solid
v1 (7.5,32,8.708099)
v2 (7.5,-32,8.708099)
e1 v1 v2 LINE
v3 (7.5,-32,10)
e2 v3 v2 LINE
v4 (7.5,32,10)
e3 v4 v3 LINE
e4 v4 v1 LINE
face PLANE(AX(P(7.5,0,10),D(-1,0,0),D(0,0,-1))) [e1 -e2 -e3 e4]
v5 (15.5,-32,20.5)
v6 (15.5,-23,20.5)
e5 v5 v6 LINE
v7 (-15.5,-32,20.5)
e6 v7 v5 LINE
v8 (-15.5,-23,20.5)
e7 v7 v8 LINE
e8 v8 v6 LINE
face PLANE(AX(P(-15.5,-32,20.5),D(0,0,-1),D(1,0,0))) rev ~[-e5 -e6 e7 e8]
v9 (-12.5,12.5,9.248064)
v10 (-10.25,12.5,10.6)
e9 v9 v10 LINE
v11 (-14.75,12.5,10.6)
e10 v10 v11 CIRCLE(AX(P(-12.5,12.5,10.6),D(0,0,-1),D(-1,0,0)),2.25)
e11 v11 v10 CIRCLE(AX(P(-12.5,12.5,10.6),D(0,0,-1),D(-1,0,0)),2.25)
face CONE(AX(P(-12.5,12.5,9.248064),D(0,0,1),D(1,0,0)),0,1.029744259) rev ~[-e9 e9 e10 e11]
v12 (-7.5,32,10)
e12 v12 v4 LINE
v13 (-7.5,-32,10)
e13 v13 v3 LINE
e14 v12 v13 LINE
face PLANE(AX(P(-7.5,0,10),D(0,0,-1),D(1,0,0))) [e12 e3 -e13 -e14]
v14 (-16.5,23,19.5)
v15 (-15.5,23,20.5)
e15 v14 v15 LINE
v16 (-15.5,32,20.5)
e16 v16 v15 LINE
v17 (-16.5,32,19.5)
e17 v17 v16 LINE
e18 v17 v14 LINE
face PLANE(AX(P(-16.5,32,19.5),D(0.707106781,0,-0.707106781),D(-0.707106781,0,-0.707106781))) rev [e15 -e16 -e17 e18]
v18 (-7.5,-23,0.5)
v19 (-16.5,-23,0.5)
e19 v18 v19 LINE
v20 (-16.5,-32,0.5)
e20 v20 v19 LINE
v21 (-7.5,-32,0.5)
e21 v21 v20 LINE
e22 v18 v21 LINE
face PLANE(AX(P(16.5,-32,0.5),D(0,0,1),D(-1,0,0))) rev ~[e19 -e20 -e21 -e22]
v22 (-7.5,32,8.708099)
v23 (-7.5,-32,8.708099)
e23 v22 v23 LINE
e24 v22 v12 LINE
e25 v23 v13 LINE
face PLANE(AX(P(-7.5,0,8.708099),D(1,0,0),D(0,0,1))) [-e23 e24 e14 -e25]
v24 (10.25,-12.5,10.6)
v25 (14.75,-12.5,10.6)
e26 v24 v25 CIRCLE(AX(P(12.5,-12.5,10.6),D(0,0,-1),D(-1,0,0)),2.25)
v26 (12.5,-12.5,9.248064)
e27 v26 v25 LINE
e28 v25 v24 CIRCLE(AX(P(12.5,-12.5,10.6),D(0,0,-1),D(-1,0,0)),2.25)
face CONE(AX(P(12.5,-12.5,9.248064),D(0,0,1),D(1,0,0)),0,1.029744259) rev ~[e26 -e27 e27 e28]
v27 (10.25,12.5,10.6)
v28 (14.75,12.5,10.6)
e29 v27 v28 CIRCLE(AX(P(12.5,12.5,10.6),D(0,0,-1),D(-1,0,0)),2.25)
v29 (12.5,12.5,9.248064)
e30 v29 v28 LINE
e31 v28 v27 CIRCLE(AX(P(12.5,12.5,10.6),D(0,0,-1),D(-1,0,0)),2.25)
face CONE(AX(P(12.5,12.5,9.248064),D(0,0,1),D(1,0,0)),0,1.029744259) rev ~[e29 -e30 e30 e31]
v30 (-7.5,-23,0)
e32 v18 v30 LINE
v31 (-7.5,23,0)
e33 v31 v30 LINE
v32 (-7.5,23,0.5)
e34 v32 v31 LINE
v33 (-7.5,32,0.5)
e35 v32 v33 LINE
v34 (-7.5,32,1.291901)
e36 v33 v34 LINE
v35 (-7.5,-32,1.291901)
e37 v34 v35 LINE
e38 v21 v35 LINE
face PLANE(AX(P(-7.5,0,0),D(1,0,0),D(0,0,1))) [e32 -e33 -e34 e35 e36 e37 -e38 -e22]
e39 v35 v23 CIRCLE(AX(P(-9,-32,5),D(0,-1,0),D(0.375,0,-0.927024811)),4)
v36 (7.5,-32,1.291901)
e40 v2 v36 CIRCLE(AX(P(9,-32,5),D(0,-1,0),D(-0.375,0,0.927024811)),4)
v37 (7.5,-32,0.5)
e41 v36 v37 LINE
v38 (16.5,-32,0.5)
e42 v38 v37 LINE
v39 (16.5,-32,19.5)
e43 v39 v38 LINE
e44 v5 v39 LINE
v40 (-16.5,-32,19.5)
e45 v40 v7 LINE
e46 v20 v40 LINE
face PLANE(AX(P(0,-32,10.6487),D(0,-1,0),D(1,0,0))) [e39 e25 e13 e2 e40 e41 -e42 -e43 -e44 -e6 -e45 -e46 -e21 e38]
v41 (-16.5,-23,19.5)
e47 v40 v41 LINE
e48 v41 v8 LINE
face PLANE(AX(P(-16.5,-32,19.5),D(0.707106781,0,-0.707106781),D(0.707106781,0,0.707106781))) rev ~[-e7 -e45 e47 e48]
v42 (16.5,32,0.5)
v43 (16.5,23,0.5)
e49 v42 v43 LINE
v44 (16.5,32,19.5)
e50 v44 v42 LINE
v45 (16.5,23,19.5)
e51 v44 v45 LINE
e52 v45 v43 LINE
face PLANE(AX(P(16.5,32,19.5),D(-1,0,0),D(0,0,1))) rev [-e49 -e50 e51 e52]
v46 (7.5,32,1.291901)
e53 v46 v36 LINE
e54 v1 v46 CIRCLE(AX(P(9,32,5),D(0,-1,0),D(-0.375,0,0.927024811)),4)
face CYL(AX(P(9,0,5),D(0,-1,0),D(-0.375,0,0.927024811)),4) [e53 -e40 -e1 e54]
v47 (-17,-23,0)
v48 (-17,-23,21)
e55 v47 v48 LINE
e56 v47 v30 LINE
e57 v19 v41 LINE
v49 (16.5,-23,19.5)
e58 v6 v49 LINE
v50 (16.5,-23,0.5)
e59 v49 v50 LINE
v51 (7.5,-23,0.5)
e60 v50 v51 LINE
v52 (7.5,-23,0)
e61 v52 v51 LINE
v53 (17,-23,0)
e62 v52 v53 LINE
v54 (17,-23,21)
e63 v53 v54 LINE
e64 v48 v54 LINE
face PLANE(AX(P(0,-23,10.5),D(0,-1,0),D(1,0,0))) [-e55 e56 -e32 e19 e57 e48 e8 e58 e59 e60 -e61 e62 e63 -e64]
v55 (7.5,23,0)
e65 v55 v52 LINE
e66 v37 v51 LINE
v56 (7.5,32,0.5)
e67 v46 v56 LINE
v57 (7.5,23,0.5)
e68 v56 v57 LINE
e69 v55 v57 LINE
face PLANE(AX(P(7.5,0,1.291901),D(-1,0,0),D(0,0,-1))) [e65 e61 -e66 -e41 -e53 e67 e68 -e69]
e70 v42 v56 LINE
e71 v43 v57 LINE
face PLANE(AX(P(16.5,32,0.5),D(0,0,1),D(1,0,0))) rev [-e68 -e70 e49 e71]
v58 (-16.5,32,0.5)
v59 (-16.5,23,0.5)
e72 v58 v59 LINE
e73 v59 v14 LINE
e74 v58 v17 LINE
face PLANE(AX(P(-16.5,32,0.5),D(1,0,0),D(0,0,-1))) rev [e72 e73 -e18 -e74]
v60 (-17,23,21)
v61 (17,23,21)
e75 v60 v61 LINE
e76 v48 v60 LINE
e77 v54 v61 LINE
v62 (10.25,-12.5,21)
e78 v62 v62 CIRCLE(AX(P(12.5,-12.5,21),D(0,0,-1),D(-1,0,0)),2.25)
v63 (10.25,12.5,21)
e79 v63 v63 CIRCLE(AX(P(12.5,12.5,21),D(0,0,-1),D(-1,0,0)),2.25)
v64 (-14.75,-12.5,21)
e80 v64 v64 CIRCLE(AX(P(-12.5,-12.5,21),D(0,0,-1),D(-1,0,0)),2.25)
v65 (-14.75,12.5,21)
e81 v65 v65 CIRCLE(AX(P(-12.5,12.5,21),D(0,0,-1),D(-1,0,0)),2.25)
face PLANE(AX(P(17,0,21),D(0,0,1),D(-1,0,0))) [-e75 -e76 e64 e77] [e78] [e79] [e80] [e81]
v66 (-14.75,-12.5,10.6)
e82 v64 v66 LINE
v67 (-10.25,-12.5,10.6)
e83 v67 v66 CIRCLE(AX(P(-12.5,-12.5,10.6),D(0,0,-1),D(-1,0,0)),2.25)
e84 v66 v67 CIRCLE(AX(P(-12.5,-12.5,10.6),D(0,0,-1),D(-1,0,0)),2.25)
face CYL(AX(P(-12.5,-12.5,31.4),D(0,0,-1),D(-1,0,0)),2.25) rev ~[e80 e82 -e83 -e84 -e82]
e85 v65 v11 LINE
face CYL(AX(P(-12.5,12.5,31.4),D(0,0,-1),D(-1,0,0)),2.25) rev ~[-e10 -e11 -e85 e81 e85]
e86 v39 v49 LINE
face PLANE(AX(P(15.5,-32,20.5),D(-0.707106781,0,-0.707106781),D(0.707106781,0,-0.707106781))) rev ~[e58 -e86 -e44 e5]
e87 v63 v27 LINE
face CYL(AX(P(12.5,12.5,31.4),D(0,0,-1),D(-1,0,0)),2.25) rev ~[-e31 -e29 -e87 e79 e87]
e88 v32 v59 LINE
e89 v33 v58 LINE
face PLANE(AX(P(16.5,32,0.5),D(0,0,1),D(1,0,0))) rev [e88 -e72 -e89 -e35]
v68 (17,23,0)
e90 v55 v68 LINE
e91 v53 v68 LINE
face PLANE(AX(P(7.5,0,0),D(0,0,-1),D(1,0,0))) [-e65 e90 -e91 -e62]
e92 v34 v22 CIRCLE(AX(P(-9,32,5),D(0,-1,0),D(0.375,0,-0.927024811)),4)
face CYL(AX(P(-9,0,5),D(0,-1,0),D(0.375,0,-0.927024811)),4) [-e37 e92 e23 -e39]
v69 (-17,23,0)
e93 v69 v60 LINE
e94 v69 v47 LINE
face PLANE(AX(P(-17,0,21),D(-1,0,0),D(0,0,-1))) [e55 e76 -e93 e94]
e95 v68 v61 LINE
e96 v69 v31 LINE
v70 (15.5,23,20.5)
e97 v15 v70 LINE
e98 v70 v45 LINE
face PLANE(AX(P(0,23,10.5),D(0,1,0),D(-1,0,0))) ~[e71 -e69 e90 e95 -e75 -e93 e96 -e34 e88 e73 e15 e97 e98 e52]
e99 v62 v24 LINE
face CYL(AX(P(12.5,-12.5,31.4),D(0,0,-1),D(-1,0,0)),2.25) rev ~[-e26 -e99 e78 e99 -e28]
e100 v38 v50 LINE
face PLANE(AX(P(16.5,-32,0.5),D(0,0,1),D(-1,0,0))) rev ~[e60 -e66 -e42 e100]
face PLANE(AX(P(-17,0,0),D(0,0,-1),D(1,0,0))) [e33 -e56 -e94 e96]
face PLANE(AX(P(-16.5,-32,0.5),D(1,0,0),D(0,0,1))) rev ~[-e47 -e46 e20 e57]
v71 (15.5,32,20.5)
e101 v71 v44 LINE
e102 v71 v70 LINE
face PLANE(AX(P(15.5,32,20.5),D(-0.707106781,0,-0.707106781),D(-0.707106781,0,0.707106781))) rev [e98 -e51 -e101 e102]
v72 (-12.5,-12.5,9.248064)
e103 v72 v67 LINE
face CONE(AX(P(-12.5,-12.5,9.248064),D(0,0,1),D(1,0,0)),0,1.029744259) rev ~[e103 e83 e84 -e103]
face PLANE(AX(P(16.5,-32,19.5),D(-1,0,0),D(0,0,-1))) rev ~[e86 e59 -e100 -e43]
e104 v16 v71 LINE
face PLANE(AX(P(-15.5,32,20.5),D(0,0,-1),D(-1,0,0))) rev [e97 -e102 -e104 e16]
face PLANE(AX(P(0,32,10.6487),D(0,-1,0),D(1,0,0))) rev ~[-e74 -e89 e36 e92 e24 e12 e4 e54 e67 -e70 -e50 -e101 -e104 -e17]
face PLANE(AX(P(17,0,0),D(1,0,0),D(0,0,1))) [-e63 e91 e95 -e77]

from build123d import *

# Parameters (mm, degrees)
F1_DEPTH = 32
F2_W     = 34
F2_H     = 21
F3_DEPTH = 9
F5_D     = 4.5
F5_DEPTH = 10.4
F5_TIP   = 1.3519363928


# Not quite as in the source:
# - a pattern or mirror of a feature is missing from the dataset's text; its kind, count and spacing are read off the source's solid


with BuildPart() as f1:
    # F0 (on Front) → F1 (new body, symmetric)
    with BuildSketch(Plane.XZ):
        with BuildLine():
            Line((-17, 21), (-17, 0))
            Line((-17, 0), (-7.5, 0))
            Line((-7.5, 0), (-7.5, 1.2919007565))
            ThreePointArc((-7.5, 1.2919007565), (-5, 5), (-7.5, 8.7080992435))
            Line((-7.5, 8.7080992435), (-7.5, 10))
            Line((-7.5, 10), (7.5, 10))
            Line((7.5, 10), (7.5, 8.7080992435))
            ThreePointArc((7.5, 8.7080992435), (5, 5), (7.5, 1.2919007565))
            Line((7.5, 1.2919007565), (7.5, 0))
            Line((7.5, 0), (17, 0))
            Line((17, 0), (17, 21))
            Line((17, 21), (-17, 21))
        make_face()
    extrude(amount=F1_DEPTH, both=True)

    # F2 (on face) → F3 (cut)
    with BuildSketch(Plane.XZ.offset(32)):
        with Locations((0, 10.5)):
            Rectangle(F2_W, F2_H)
        Polygon((-16.5, 19.5), (-15.5, 20.5), (15.5, 20.5), (16.5, 19.5), (16.5, 0.5), (-16.5, 0.5), align=None, mode=Mode.SUBTRACT)
    f3 = extrude(amount=-F3_DEPTH, mode=Mode.SUBTRACT)

    # F3_copies: F3 across plane
    add(f3.mirror(Plane.ZX), mode=Mode.SUBTRACT)

    # F5
    with Locations(Plane.XY.offset(21)):
        with Locations((-12.5, 12.5), (12.5, 12.5), (12.5, -12.5), (-12.5, -12.5)):
            Hole(F5_D / 2, depth=F5_DEPTH)
            with Locations((0, 0, -(F5_DEPTH + F5_TIP / 2))):  # 118° drill point
                Cone(0, F5_D / 2, F5_TIP, mode=Mode.SUBTRACT)


solid = f1.part
